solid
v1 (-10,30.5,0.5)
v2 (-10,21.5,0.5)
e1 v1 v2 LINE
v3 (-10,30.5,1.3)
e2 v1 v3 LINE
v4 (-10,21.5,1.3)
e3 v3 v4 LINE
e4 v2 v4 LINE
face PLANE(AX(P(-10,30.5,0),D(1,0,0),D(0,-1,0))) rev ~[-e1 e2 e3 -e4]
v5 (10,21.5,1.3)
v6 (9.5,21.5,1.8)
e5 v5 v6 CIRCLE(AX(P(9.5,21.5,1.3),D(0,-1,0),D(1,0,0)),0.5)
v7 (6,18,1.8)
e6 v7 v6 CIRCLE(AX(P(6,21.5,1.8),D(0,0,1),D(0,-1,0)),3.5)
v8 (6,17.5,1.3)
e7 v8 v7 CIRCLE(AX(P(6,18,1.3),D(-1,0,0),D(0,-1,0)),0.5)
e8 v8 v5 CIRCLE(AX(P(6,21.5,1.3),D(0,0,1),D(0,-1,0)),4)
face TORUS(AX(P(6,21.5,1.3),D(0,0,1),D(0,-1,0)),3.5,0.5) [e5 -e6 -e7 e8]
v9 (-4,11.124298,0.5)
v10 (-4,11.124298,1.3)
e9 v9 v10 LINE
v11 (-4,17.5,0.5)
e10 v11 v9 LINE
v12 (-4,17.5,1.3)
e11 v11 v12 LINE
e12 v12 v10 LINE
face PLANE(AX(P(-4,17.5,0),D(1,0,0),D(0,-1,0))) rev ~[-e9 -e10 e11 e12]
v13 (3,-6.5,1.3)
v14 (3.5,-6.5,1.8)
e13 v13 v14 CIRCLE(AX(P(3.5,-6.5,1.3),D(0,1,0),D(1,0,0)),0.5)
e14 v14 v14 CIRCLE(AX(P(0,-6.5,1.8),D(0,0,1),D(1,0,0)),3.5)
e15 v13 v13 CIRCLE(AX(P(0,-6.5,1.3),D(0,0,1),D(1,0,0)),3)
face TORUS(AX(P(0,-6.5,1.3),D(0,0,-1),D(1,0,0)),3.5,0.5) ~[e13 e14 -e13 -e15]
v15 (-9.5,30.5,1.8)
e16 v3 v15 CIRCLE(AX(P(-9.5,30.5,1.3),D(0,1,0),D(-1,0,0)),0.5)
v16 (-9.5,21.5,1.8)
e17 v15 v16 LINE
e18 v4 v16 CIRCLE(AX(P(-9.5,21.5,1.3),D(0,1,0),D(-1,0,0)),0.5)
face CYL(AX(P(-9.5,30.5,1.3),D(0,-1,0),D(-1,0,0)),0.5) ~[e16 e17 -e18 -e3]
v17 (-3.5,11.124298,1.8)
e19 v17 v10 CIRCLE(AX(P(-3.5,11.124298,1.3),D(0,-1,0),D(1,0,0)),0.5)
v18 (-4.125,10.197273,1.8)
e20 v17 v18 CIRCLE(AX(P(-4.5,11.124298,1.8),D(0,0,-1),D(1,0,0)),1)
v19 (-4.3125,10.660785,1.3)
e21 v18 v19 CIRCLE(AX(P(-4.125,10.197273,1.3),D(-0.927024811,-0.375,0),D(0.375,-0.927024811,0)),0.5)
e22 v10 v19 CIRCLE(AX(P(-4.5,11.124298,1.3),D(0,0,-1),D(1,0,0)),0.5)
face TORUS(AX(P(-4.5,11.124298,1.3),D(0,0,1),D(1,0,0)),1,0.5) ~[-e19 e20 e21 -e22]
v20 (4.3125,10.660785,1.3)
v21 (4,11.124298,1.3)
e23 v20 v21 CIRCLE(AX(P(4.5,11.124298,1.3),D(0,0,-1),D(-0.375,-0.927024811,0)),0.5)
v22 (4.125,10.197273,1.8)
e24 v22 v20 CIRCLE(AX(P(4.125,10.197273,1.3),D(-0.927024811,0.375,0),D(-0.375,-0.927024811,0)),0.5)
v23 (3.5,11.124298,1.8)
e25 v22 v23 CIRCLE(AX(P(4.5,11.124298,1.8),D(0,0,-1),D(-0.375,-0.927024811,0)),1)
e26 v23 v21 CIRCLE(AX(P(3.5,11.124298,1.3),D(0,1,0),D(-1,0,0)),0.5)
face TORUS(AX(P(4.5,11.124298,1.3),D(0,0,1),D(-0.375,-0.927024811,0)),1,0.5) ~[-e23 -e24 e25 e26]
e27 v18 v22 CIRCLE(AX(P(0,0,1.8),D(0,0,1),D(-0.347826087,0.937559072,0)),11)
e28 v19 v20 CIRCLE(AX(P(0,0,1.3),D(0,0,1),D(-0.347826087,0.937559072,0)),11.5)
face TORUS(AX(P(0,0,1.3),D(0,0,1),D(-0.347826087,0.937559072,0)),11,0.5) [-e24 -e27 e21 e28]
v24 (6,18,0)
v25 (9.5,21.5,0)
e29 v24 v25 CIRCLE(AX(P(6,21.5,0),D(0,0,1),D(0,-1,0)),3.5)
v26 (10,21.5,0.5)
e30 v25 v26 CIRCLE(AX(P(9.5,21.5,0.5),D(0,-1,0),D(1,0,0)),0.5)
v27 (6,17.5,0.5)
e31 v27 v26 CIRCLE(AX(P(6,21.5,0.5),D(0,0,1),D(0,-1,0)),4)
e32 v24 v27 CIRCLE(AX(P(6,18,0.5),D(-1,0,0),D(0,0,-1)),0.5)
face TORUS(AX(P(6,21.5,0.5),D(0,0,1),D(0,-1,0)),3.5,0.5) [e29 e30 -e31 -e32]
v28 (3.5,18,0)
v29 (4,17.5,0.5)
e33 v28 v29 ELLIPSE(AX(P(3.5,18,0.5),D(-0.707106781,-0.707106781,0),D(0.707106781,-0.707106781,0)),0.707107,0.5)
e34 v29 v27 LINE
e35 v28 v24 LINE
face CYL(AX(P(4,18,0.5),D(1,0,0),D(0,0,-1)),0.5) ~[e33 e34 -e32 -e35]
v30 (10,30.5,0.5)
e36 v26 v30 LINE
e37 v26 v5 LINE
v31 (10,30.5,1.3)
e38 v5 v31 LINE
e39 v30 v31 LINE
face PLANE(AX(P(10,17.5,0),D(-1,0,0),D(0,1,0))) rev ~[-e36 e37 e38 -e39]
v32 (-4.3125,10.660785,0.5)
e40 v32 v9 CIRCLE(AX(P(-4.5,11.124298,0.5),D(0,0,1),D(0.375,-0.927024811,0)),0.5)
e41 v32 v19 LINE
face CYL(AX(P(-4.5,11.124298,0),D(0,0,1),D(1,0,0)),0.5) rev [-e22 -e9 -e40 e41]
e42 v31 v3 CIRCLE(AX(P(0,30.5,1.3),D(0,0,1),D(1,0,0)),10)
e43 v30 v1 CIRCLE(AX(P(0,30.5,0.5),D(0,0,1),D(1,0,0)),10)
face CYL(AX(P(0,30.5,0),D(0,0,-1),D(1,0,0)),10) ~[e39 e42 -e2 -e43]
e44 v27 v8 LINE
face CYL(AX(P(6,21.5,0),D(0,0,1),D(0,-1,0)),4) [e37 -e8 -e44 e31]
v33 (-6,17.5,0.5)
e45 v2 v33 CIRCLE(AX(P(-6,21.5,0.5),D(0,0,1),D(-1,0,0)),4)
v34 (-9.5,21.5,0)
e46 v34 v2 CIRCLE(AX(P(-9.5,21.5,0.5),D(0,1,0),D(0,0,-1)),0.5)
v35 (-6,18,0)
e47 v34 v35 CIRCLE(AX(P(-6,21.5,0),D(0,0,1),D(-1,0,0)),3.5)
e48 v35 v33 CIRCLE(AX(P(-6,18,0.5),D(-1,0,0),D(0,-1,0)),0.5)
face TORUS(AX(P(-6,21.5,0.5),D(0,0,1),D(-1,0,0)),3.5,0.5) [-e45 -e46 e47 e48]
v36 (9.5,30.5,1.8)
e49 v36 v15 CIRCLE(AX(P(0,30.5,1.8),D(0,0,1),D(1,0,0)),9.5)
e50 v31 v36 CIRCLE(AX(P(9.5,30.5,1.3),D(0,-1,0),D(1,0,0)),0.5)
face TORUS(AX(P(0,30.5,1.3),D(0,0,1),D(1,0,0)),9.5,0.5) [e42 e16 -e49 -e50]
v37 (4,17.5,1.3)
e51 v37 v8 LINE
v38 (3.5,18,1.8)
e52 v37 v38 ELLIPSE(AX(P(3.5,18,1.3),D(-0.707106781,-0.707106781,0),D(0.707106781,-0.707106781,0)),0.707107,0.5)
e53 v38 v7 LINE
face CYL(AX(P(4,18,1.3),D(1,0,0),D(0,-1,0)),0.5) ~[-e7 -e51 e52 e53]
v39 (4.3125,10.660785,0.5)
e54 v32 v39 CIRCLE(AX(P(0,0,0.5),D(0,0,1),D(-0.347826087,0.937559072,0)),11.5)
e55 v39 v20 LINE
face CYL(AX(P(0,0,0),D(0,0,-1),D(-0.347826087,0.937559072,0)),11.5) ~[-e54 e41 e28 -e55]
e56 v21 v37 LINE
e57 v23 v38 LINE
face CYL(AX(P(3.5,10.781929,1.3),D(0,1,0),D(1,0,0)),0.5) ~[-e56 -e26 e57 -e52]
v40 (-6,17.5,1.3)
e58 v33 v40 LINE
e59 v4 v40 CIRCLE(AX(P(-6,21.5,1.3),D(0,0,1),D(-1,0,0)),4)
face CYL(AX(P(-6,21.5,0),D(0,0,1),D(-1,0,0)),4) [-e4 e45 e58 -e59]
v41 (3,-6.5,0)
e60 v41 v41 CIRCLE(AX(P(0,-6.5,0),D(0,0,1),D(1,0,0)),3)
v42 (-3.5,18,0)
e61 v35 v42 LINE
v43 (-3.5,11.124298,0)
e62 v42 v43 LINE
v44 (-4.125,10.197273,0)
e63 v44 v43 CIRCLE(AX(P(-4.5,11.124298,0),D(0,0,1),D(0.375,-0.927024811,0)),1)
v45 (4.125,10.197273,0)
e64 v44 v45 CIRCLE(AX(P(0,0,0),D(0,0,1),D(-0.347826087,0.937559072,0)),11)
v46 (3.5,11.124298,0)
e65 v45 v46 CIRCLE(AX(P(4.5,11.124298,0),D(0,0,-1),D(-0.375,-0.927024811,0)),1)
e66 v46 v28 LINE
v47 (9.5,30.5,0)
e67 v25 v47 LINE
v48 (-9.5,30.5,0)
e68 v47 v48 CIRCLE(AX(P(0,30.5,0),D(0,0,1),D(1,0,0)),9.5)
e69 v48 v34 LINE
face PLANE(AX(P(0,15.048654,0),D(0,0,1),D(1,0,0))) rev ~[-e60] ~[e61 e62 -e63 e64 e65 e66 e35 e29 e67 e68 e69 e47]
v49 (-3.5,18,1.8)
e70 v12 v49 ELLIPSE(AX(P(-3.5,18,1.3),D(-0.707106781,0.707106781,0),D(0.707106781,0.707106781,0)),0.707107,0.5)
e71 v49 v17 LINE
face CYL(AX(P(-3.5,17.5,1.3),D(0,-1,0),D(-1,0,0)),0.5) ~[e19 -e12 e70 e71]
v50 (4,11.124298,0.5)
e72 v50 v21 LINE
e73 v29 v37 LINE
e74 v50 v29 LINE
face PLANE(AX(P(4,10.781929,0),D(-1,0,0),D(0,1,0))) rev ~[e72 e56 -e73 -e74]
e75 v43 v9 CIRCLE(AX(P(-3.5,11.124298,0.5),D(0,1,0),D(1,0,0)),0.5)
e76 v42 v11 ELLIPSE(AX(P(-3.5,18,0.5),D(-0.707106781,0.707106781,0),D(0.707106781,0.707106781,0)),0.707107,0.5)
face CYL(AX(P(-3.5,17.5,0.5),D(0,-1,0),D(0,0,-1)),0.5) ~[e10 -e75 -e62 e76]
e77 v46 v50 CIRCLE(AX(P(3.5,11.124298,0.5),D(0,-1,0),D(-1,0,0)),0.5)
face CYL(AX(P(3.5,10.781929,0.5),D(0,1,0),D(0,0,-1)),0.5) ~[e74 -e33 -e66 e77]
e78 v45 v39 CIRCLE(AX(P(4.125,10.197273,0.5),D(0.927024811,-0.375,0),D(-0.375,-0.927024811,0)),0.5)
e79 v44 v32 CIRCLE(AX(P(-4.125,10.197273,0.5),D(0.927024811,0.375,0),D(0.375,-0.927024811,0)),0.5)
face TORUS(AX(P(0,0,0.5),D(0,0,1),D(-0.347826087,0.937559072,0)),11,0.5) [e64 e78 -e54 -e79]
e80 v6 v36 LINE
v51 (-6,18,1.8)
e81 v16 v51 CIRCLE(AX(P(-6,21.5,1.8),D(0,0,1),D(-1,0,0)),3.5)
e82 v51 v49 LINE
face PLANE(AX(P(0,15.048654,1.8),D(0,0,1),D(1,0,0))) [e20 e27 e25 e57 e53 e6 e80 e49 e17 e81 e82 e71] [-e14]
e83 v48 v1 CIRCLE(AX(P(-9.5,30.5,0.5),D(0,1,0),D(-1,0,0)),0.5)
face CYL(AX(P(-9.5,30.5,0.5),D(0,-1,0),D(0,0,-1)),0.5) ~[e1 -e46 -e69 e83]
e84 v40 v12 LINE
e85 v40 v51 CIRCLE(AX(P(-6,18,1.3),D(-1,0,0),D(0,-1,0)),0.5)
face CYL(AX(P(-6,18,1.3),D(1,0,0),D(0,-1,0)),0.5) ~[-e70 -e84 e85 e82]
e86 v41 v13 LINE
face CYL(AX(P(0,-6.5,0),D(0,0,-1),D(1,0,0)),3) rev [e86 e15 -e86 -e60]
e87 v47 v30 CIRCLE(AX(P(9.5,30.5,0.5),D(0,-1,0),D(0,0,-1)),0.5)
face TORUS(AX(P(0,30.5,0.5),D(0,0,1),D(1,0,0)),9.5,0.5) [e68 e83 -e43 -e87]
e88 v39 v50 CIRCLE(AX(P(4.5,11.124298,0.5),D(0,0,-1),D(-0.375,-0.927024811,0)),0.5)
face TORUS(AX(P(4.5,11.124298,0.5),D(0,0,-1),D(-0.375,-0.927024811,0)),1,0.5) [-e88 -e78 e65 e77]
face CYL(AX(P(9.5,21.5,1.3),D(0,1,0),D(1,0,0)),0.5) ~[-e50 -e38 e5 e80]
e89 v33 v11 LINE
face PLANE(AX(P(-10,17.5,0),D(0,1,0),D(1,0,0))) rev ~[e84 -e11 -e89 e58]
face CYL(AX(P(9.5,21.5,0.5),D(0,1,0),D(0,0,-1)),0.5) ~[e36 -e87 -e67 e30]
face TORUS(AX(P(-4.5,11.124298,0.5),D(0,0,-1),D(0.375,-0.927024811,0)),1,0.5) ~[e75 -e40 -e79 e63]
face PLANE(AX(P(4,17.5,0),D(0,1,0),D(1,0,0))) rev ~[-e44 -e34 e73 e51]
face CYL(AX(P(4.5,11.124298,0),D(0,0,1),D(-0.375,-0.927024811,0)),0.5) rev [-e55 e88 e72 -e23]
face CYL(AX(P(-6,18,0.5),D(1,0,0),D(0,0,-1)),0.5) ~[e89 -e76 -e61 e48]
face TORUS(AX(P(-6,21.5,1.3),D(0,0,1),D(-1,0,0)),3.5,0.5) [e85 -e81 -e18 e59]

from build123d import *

# Parameters (mm, degrees)
F0_R     = 3
F1_DEPTH = 1.8
F2_R     = 4
F3_R     = 4
F4_R     = 0.5


with BuildPart() as f1:
    # F0 (on Top) → F1 (new body)
    with BuildSketch(Plane.XY):
        with BuildLine():
            Line((-4, 17.5), (-4, 10.7819293264))
            ThreePointArc((-4, 10.7819293264), (0, -11.5), (4, 10.7819293264))
            Line((4, 10.7819293264), (4, 17.5))
            Line((4, 17.5), (10, 17.5))
            Line((10, 17.5), (10, 30.5))
            ThreePointArc((10, 30.5), (0, 40.5), (-10, 30.5))
            Line((-10, 30.5), (-10, 17.5))
            Line((-10, 17.5), (-4, 17.5))
        make_face()
        with Locations((0, -6.5)):
            Circle(F0_R, mode=Mode.SUBTRACT)
    extrude(amount=F1_DEPTH)

    # F2
    f2_edges = [f1.edges().sort_by_distance(p)[0] for p in [
        (10, 17.5, 0.9),
    ]]
    fillet(f2_edges, radius=F2_R)

    # F3
    f3_edges = [f1.edges().sort_by_distance(p)[0] for p in [
        (-10, 17.5, 0.9),
    ]]
    fillet(f3_edges, radius=F3_R)

    # F4
    f4_edges = [f1.edges().sort_by_distance(p)[0] for p in [
        (-10, 26, 1.8),
        (-8.828427, 18.671573, 1.8),
        (0, 40.5, 1.8),
        (-5, 17.5, 1.8),
        (10, 26, 1.8),
        (-4, 14.140965, 1.8),
        (8.828427, 18.671573, 1.8),
        (0, -11.5, 1.8),
        (5, 17.5, 1.8),
        (4, 14.140965, 1.8),
        (-3, -6.5, 1.8),
        (-4, 10.781929, 0.9),
        (4, 10.781929, 0.9),
        (0, -11.5, 0),
        (10, 26, 0),
        (8.828427, 18.671573, 0),
        (5, 17.5, 0),
        (-10, 26, 0),
        (-8.828427, 18.671573, 0),
        (0, 40.5, 0),
        (-5, 17.5, 0),
        (-4, 14.140965, 0),
        (4, 14.140965, 0),
    ]]
    fillet(f4_edges, radius=F4_R)


solid = f1.part
